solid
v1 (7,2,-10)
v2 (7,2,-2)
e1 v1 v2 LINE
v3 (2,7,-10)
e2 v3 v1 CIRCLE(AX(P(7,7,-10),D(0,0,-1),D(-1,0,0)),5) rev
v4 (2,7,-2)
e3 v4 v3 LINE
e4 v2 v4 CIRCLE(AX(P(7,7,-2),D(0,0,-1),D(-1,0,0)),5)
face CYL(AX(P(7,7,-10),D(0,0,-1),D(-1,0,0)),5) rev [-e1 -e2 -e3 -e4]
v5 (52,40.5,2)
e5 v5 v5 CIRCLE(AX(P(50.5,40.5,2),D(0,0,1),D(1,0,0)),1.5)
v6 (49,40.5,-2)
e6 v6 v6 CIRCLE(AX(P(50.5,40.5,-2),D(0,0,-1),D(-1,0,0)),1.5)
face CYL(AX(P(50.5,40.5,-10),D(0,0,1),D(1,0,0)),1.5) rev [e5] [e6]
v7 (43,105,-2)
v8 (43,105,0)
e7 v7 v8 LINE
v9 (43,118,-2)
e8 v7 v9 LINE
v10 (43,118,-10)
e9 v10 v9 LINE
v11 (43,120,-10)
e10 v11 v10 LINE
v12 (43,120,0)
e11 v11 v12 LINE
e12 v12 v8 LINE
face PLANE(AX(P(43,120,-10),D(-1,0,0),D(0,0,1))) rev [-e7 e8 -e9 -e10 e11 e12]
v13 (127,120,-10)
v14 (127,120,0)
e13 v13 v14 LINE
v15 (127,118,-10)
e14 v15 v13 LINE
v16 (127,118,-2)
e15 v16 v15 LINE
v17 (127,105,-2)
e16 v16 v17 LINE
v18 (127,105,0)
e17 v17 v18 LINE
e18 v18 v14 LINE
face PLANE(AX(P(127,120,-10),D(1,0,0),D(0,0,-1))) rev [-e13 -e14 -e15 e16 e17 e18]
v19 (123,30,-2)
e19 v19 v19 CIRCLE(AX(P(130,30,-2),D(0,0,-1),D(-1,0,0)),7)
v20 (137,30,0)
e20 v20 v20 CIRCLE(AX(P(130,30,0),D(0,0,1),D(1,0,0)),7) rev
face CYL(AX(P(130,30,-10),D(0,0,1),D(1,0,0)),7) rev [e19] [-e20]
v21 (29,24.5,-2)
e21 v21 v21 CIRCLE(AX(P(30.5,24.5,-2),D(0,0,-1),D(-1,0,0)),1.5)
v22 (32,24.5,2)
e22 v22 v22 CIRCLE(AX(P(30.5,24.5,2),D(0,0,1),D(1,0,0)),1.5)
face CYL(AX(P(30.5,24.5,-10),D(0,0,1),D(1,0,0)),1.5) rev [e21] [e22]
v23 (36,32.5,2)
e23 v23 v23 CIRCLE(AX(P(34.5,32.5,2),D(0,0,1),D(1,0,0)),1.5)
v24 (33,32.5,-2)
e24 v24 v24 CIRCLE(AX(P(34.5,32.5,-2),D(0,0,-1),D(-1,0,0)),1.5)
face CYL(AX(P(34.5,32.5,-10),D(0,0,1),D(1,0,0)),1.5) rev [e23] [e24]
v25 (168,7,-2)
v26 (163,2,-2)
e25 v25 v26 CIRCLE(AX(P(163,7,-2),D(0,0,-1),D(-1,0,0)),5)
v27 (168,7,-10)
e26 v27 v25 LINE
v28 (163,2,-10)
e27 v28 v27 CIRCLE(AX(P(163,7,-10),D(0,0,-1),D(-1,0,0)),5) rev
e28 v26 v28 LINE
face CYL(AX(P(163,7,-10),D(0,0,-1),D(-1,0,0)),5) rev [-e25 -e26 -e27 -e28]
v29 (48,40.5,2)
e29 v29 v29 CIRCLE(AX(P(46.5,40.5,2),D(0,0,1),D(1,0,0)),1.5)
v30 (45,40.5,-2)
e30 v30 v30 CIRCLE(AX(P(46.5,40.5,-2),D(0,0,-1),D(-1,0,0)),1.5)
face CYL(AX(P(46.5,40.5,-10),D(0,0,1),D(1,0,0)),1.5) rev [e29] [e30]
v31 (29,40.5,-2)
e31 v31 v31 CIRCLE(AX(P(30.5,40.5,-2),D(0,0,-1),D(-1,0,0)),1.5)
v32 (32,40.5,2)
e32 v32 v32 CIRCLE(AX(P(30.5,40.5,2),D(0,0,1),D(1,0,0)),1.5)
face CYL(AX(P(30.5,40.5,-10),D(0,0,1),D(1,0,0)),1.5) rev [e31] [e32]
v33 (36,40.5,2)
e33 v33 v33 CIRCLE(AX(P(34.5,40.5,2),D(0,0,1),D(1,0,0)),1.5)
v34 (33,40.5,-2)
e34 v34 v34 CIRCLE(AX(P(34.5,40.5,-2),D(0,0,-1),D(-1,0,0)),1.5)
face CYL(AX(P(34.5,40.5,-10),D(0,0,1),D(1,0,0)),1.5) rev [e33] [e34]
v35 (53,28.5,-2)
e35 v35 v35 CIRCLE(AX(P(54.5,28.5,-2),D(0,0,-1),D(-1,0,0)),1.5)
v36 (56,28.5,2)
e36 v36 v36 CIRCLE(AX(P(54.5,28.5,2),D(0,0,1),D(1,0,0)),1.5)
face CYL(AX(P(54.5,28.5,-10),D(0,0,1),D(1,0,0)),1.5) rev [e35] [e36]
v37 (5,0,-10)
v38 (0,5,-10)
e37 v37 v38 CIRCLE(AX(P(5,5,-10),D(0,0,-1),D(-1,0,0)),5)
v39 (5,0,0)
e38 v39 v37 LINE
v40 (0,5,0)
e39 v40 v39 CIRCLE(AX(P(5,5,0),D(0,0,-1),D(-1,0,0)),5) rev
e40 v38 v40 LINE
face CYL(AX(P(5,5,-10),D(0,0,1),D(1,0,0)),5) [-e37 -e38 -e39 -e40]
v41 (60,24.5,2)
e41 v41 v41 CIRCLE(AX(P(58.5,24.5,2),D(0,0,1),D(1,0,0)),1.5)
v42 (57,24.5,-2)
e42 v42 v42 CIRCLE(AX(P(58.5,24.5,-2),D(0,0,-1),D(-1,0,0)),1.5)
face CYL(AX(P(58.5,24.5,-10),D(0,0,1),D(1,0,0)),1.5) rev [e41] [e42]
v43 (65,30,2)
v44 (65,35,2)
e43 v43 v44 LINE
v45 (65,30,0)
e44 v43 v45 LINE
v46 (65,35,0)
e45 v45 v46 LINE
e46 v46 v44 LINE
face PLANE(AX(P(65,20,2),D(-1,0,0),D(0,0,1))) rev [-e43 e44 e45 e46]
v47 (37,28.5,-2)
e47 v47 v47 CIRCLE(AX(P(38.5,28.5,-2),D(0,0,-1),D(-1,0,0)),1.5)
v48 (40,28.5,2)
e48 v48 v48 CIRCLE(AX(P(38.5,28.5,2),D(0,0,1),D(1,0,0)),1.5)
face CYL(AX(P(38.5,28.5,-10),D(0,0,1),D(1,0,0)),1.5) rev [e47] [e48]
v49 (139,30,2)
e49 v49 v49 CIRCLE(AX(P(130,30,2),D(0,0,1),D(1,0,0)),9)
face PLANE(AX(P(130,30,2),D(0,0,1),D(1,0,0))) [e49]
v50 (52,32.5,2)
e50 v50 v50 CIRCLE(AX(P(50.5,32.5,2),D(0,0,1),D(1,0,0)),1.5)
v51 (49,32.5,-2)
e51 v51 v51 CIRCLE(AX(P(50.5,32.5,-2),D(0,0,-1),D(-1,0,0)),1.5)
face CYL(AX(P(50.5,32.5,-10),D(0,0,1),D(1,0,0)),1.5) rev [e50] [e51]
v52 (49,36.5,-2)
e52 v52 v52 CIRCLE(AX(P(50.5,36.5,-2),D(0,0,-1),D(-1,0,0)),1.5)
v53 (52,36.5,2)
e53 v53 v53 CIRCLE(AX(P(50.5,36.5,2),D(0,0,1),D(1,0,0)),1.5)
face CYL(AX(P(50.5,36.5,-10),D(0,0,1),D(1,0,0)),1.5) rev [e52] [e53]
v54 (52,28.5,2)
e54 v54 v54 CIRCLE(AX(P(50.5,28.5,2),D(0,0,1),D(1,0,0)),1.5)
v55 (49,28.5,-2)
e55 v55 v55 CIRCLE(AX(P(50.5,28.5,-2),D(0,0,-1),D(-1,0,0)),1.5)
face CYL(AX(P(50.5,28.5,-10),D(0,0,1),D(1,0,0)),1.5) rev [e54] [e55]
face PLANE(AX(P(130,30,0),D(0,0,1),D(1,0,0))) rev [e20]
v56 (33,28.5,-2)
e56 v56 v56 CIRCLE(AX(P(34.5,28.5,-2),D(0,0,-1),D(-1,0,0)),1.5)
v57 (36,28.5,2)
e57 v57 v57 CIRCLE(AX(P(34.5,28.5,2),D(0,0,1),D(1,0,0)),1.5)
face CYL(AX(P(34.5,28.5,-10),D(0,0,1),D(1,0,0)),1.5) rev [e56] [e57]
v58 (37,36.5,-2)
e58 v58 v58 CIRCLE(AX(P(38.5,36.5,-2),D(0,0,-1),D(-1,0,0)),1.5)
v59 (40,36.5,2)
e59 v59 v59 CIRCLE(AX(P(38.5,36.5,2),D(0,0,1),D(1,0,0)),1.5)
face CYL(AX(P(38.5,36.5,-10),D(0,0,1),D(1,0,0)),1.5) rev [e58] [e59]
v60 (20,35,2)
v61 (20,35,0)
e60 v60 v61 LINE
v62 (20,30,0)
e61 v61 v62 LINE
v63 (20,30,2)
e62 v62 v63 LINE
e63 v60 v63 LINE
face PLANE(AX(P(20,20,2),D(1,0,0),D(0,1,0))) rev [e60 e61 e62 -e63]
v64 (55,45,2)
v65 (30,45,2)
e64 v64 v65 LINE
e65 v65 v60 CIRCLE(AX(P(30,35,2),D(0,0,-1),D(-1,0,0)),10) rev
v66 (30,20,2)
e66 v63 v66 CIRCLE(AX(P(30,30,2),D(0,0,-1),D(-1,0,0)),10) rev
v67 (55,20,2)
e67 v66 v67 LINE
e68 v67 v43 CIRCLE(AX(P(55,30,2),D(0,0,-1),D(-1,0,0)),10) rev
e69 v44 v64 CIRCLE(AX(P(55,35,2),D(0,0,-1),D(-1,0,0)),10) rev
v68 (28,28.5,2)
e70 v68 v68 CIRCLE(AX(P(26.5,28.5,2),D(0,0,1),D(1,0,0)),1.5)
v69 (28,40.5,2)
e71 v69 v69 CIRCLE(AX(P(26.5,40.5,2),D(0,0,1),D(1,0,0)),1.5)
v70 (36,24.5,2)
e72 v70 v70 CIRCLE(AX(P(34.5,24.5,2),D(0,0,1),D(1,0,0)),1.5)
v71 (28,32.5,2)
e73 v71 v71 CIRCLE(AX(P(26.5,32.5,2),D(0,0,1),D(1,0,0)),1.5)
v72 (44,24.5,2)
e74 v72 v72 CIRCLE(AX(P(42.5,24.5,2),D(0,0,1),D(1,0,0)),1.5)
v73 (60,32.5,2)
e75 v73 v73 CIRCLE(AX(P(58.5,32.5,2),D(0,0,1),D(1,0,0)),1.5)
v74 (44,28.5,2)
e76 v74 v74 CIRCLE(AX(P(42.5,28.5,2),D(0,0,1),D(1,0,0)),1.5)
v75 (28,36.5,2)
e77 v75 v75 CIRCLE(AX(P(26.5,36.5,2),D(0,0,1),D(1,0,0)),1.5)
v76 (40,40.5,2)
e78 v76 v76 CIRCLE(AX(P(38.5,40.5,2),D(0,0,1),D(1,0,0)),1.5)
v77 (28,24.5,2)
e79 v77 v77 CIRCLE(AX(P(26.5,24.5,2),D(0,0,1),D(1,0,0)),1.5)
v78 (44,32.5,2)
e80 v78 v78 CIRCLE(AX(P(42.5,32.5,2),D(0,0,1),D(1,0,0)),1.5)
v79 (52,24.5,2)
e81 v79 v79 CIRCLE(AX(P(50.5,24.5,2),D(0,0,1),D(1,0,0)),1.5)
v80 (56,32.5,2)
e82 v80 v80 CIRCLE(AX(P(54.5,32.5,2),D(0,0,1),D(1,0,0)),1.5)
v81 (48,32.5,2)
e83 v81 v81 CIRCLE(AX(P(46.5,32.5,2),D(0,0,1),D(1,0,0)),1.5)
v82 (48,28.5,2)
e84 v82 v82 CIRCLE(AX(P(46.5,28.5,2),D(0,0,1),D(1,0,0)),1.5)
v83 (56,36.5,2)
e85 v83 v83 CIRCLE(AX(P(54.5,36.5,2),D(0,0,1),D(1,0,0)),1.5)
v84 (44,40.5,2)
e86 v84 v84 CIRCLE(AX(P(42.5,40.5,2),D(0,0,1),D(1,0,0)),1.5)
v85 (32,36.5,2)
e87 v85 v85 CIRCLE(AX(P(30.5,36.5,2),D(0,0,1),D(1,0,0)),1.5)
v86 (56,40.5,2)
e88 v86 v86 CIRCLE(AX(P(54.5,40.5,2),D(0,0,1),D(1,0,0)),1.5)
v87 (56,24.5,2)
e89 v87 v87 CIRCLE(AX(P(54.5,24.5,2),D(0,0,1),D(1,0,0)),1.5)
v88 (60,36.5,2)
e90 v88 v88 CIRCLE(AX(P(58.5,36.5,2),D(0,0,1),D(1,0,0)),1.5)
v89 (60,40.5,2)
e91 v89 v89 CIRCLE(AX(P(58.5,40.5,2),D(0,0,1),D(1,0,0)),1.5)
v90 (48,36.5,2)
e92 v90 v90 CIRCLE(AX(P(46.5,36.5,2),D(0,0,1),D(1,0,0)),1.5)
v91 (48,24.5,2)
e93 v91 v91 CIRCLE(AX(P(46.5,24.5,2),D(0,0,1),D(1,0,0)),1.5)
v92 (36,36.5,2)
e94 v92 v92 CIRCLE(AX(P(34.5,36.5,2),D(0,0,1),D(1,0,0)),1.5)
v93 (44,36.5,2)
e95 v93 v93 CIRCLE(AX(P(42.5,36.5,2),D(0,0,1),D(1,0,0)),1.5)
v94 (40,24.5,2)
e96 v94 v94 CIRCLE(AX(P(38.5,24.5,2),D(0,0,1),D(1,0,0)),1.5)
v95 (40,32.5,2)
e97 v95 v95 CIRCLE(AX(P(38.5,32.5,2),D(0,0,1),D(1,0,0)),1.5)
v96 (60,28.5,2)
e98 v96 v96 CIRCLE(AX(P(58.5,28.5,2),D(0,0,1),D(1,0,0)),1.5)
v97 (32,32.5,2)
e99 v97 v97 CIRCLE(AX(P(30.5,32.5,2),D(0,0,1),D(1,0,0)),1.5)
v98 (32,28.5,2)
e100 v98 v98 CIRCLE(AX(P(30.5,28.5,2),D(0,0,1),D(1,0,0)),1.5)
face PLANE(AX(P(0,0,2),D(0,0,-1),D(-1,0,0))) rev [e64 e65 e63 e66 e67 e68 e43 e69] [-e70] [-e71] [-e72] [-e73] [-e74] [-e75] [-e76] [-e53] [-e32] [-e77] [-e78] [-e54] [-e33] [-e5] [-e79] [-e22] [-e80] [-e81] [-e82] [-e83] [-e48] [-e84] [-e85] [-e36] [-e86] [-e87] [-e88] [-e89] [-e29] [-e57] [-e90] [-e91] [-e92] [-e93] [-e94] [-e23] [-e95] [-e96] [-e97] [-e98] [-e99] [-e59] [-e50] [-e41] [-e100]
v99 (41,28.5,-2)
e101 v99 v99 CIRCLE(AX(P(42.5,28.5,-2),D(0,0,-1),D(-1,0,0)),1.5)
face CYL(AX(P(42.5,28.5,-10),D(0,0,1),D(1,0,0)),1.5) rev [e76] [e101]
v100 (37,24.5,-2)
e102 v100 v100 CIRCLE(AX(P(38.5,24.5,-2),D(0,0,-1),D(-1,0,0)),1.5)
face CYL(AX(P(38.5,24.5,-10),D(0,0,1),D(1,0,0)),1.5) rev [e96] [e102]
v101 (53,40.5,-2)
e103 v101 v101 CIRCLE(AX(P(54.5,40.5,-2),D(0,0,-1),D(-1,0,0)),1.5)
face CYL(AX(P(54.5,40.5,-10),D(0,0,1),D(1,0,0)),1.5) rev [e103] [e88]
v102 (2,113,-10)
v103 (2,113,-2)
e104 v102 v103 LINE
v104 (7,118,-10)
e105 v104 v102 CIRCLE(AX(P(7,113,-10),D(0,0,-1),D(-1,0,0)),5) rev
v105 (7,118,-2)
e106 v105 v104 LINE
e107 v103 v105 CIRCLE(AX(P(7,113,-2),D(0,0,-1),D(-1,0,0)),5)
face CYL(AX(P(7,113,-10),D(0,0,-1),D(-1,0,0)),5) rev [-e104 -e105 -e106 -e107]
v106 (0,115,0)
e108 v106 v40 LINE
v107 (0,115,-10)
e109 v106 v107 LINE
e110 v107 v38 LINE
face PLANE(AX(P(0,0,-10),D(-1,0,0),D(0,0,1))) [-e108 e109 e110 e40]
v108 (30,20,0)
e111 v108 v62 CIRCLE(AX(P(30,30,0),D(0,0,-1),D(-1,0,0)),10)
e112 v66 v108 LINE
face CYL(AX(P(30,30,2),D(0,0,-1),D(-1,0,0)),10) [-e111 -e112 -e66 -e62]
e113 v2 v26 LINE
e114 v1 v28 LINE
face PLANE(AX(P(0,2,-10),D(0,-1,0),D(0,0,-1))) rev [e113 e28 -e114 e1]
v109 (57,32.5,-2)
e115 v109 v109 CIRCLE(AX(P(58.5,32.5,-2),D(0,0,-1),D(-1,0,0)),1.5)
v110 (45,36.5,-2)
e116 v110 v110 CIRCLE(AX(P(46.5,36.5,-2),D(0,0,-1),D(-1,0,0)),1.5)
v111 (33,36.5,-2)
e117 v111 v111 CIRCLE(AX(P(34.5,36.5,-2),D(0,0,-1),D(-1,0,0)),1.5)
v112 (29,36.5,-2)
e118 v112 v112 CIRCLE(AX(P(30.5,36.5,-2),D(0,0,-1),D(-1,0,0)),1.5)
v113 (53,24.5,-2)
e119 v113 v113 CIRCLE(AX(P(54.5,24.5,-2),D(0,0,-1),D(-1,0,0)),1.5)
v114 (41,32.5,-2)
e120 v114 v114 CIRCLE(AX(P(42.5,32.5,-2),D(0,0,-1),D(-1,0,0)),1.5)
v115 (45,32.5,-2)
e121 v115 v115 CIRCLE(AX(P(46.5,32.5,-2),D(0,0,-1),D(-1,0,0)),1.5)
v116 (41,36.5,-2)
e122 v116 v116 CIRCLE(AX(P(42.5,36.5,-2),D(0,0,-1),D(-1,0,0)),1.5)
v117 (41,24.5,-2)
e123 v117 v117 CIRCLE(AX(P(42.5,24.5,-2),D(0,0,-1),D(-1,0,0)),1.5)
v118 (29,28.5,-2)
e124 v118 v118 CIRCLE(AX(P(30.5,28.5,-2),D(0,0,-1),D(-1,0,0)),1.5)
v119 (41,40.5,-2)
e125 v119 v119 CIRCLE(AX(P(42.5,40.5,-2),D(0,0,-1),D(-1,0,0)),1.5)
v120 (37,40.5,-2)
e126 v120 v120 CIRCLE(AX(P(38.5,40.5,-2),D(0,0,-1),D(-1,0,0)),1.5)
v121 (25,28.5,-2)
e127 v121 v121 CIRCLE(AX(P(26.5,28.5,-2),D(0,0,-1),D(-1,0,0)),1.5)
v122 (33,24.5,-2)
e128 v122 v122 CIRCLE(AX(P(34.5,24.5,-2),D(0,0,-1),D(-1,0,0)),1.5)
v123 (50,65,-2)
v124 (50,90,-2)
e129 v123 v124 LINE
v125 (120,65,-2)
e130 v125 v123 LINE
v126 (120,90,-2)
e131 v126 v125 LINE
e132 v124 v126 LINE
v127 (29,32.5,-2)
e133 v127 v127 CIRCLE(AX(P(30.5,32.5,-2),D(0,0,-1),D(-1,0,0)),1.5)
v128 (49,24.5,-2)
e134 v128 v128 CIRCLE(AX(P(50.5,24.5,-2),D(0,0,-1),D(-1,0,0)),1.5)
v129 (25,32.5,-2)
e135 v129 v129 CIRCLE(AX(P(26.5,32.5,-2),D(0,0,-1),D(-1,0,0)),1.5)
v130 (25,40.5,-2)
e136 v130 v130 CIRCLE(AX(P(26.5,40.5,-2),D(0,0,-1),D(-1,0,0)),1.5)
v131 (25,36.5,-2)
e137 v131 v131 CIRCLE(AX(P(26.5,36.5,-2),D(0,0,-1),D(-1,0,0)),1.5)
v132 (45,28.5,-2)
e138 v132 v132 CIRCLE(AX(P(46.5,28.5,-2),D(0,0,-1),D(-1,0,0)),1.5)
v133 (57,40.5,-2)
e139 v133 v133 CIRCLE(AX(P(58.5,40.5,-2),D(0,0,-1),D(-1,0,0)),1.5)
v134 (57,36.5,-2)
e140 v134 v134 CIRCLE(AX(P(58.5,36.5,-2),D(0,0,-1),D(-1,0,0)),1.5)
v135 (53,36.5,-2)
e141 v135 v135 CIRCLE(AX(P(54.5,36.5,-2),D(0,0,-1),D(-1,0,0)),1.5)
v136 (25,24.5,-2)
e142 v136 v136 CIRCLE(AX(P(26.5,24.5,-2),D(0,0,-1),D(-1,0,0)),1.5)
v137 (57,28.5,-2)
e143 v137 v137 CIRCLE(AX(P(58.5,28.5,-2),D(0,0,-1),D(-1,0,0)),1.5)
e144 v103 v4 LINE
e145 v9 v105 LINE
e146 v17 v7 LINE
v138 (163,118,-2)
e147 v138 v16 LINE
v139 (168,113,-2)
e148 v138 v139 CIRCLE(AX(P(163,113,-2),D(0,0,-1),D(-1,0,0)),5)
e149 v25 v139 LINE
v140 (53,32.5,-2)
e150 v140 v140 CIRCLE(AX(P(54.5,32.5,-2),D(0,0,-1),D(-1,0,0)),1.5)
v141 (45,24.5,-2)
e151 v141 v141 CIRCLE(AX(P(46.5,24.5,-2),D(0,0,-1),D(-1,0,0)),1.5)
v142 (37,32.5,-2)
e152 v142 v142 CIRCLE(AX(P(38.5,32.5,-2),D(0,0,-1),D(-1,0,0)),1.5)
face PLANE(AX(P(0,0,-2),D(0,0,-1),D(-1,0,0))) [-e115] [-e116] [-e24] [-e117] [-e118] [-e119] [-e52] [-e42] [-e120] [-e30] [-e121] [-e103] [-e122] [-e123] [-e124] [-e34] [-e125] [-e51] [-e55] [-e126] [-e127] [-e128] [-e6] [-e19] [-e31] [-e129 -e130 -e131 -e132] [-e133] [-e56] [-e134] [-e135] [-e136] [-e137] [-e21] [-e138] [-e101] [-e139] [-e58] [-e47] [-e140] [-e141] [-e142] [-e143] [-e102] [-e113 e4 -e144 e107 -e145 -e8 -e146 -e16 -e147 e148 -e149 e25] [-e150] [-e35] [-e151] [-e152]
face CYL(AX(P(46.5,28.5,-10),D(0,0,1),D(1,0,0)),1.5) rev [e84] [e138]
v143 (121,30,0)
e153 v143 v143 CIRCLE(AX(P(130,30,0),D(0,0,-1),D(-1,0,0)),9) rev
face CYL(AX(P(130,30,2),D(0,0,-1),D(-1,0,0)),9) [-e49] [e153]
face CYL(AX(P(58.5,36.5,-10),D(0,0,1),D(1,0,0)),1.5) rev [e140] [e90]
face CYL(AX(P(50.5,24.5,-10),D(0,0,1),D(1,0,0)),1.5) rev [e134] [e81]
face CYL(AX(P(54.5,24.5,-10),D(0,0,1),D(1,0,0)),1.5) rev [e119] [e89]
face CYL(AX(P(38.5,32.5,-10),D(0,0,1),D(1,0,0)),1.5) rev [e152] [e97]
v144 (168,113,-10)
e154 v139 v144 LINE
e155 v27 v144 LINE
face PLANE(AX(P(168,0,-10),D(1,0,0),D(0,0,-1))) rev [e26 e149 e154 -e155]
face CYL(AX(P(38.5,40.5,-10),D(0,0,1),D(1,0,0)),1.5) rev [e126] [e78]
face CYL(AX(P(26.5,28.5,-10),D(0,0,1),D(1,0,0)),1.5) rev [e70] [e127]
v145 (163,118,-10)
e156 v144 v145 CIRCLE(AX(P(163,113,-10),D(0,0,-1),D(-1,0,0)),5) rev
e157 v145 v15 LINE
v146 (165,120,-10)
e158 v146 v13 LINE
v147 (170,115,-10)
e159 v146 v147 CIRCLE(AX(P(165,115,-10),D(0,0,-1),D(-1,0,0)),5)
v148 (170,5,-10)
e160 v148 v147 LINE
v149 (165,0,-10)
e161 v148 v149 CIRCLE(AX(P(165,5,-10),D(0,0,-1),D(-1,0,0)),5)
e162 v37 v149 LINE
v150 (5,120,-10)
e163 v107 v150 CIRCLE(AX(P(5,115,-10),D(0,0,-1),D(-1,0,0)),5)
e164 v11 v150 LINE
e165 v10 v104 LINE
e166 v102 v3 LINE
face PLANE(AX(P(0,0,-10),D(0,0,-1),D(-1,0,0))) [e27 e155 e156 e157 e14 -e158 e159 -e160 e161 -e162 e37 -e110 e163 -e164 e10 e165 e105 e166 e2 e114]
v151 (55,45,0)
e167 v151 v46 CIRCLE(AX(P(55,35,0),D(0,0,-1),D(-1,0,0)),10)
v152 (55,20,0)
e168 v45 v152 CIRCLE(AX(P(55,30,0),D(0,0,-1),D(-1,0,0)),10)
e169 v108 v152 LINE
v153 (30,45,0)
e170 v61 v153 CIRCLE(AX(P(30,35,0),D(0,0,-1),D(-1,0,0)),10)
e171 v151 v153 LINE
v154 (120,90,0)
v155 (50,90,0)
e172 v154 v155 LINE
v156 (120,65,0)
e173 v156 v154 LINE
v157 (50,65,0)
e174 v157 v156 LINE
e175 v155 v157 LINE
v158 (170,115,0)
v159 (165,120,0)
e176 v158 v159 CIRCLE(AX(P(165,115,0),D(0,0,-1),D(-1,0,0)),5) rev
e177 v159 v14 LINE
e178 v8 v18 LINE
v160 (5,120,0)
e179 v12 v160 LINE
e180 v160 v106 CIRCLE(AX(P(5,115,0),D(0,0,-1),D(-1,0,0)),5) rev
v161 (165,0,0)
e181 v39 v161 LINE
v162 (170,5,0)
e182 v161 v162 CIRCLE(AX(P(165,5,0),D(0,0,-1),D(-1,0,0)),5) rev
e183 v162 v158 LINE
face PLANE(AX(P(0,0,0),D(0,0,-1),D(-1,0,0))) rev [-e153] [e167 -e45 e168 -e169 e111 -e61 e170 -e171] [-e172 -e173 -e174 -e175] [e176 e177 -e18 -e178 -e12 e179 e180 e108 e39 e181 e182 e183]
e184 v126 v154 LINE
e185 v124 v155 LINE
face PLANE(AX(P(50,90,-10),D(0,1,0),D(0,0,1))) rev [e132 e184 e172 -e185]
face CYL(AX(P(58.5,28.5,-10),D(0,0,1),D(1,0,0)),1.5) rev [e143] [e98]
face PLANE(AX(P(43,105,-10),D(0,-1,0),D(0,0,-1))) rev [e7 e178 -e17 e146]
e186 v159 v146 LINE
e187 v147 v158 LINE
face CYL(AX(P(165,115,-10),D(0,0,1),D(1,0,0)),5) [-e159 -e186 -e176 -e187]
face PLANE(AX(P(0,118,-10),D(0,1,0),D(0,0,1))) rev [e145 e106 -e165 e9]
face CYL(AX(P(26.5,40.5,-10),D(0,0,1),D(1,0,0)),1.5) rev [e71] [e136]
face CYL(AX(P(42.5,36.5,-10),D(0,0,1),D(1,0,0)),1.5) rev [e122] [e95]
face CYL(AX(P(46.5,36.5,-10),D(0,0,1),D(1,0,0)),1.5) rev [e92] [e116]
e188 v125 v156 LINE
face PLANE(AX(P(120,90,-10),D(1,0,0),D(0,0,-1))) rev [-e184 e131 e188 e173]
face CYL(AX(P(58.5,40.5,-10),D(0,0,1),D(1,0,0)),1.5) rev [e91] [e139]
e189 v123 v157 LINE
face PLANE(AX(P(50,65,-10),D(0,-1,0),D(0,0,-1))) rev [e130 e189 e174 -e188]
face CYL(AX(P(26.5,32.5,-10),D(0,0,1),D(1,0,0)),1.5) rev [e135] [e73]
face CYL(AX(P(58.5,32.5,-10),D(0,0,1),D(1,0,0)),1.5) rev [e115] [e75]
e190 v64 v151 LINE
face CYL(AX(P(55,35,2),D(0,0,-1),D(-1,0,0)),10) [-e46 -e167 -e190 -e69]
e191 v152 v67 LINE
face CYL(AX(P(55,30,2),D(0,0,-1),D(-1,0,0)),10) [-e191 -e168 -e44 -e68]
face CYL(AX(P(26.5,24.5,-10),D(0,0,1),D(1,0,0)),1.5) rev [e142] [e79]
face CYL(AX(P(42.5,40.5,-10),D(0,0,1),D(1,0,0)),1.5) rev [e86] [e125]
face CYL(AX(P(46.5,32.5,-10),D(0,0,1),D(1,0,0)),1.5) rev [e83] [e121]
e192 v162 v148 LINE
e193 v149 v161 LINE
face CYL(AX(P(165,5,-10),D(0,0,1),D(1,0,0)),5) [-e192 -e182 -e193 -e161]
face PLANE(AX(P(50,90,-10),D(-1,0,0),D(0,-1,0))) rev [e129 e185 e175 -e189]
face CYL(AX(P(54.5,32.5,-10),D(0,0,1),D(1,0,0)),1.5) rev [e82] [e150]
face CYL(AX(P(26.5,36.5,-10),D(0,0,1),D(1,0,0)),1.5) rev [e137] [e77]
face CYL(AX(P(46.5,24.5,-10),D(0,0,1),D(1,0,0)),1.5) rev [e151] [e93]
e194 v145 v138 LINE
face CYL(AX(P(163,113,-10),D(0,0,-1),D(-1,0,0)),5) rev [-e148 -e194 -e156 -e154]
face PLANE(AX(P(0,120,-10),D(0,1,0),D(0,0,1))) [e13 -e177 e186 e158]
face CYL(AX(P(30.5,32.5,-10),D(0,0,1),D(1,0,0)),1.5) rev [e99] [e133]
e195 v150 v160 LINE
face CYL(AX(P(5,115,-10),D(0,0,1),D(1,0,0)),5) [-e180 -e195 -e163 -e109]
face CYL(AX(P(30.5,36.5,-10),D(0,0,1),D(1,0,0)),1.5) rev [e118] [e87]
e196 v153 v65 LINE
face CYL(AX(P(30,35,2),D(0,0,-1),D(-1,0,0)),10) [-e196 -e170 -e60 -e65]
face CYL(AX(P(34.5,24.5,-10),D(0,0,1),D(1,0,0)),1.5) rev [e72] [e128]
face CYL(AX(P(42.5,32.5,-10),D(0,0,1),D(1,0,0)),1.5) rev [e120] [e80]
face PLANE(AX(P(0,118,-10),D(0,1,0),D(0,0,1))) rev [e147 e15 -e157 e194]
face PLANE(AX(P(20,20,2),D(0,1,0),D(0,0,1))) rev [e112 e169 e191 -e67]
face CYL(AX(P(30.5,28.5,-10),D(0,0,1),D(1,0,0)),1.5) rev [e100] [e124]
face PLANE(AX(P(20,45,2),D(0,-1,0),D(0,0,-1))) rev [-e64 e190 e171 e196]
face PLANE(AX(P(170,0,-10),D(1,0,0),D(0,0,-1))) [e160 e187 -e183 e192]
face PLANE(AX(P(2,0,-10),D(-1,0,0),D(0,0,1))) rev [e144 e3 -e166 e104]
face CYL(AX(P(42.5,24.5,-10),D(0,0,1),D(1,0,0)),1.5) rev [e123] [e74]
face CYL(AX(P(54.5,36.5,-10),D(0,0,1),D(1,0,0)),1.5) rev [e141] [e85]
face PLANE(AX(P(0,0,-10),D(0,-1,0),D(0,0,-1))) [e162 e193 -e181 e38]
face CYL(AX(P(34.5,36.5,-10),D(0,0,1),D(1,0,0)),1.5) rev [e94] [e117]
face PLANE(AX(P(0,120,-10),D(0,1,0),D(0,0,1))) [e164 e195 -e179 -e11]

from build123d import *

# Parameters (mm, degrees)
SKETCH1_W               = 170
SKETCH1_H               = 120
BOSS_EXTRUDE1_DEPTH     = 10
SHELL1_T                = -2
FILLET1_R               = 5
SKETCH2_R               = 7
CUT_EXTRUDE1_DEPTH      = 209.32666656
SKETCH3_R               = 9
BOSS_EXTRUDE2_DEPTH     = 2
SKETCH4_W               = 70
SKETCH4_H               = 25
CUT_EXTRUDE2_DEPTH      = 209.32666656
SKETCH10_W              = 45
SKETCH10_H              = 25
BOSS_EXTRUDE4_DEPTH     = 2
FILL_START              = -2
FILL_PATTERN2_OUTLINE_R = 1.5
FILL_PATTERN2_DEPTH     = 4
FILLET2_R               = 10
SKETCH11_W              = 84
SKETCH11_H              = 15
CUT_EXTRUDE3_DEPTH      = 209.32666656


# Read off the part's stored shape, not the designer's step: Fill Pattern2
with BuildPart() as part:
    # Sketch1 → Boss-Extrude1 (new body)
    with BuildSketch(Plane.XY):
        with Locations((85, 60)):
            Rectangle(SKETCH1_W, SKETCH1_H)
    extrude(amount=-BOSS_EXTRUDE1_DEPTH)

    # Shell1
    shell1_openings = [part.faces().sort_by_distance(p)[0] for p in [
        (85, 60, -10),
    ]]
    offset(amount=SHELL1_T, openings=shell1_openings, kind=Kind.INTERSECTION)

    # Fillet1
    fillet1_edges = [part.edges().sort_by_distance(p)[0] for p in [
        (2, 2, -6),
        (2, 118, -6),
        (168, 118, -6),
        (168, 2, -6),
        (0, 120, -5),
        (170, 120, -5),
        (170, 0, -5),
        (0, 0, -5),
    ]]
    fillet(fillet1_edges, radius=FILLET1_R)

    # Sketch2 → Cut-Extrude1 (cut, through all)
    with BuildSketch(Plane.XY):
        with Locations((130, 30)):
            Circle(SKETCH2_R)
    extrude(amount=-CUT_EXTRUDE1_DEPTH, mode=Mode.SUBTRACT)

    # Sketch3 → Boss-Extrude2 (add)
    with BuildSketch(Plane.XY):
        with Locations(Location((130, 30, 0), (0, 0, 180))):
            Circle(SKETCH3_R)
    extrude(amount=BOSS_EXTRUDE2_DEPTH)

    # Sketch4 → Cut-Extrude2 (cut, through all)
    with BuildSketch(Plane.XY):
        with Locations((85, 77.5)):
            Rectangle(SKETCH4_W, SKETCH4_H)
    extrude(amount=-CUT_EXTRUDE2_DEPTH, mode=Mode.SUBTRACT)

    # Sketch10 → Boss-Extrude4 (add)
    with BuildSketch(Plane.XY):
        with Locations((42.5, 32.5)):
            Rectangle(SKETCH10_W, SKETCH10_H)
    extrude(amount=BOSS_EXTRUDE4_DEPTH)

    # Fill Pattern2 outline → Fill Pattern2 (cut)
    with BuildSketch(Plane.XY.offset(FILL_START)):
        with Locations((42.5, 32.5)):
            Circle(FILL_PATTERN2_OUTLINE_R)
        with Locations((30.5, 32.5)):
            Circle(FILL_PATTERN2_OUTLINE_R)
        with Locations((30.5, 36.5)):
            Circle(FILL_PATTERN2_OUTLINE_R)
        with Locations((30.5, 40.5)):
            Circle(FILL_PATTERN2_OUTLINE_R)
        with Locations((26.5, 24.5)):
            Circle(FILL_PATTERN2_OUTLINE_R)
        with Locations((30.5, 24.5)):
            Circle(FILL_PATTERN2_OUTLINE_R)
        with Locations((42.5, 40.5)):
            Circle(FILL_PATTERN2_OUTLINE_R)
        with Locations((30.5, 28.5)):
            Circle(FILL_PATTERN2_OUTLINE_R)
        with Locations((46.5, 40.5)):
            Circle(FILL_PATTERN2_OUTLINE_R)
        with Locations((26.5, 28.5)):
            Circle(FILL_PATTERN2_OUTLINE_R)
        with Locations((26.5, 32.5)):
            Circle(FILL_PATTERN2_OUTLINE_R)
        with Locations((26.5, 36.5)):
            Circle(FILL_PATTERN2_OUTLINE_R)
        with Locations((26.5, 40.5)):
            Circle(FILL_PATTERN2_OUTLINE_R)
        with Locations((54.5, 32.5)):
            Circle(FILL_PATTERN2_OUTLINE_R)
        with Locations((50.5, 28.5)):
            Circle(FILL_PATTERN2_OUTLINE_R)
        with Locations((42.5, 28.5)):
            Circle(FILL_PATTERN2_OUTLINE_R)
        with Locations((58.5, 40.5)):
            Circle(FILL_PATTERN2_OUTLINE_R)
        with Locations((54.5, 28.5)):
            Circle(FILL_PATTERN2_OUTLINE_R)
        with Locations((50.5, 24.5)):
            Circle(FILL_PATTERN2_OUTLINE_R)
        with Locations((38.5, 28.5)):
            Circle(FILL_PATTERN2_OUTLINE_R)
        with Locations((58.5, 36.5)):
            Circle(FILL_PATTERN2_OUTLINE_R)
        with Locations((50.5, 36.5)):
            Circle(FILL_PATTERN2_OUTLINE_R)
        with Locations((46.5, 32.5)):
            Circle(FILL_PATTERN2_OUTLINE_R)
        with Locations((50.5, 40.5)):
            Circle(FILL_PATTERN2_OUTLINE_R)
        with Locations((46.5, 36.5)):
            Circle(FILL_PATTERN2_OUTLINE_R)
        with Locations((54.5, 36.5)):
            Circle(FILL_PATTERN2_OUTLINE_R)
        with Locations((50.5, 32.5)):
            Circle(FILL_PATTERN2_OUTLINE_R)
        with Locations((46.5, 28.5)):
            Circle(FILL_PATTERN2_OUTLINE_R)
        with Locations((54.5, 40.5)):
            Circle(FILL_PATTERN2_OUTLINE_R)
        with Locations((42.5, 36.5)):
            Circle(FILL_PATTERN2_OUTLINE_R)
        with Locations((38.5, 24.5)):
            Circle(FILL_PATTERN2_OUTLINE_R)
        with Locations((34.5, 24.5)):
            Circle(FILL_PATTERN2_OUTLINE_R)
        with Locations((34.5, 28.5)):
            Circle(FILL_PATTERN2_OUTLINE_R)
        with Locations((34.5, 32.5)):
            Circle(FILL_PATTERN2_OUTLINE_R)
        with Locations((34.5, 36.5)):
            Circle(FILL_PATTERN2_OUTLINE_R)
        with Locations((34.5, 40.5)):
            Circle(FILL_PATTERN2_OUTLINE_R)
        with Locations((38.5, 40.5)):
            Circle(FILL_PATTERN2_OUTLINE_R)
        with Locations((58.5, 32.5)):
            Circle(FILL_PATTERN2_OUTLINE_R)
        with Locations((38.5, 32.5)):
            Circle(FILL_PATTERN2_OUTLINE_R)
        with Locations((46.5, 24.5)):
            Circle(FILL_PATTERN2_OUTLINE_R)
        with Locations((54.5, 24.5)):
            Circle(FILL_PATTERN2_OUTLINE_R)
        with Locations((58.5, 28.5)):
            Circle(FILL_PATTERN2_OUTLINE_R)
        with Locations((38.5, 36.5)):
            Circle(FILL_PATTERN2_OUTLINE_R)
        with Locations((42.5, 24.5)):
            Circle(FILL_PATTERN2_OUTLINE_R)
        with Locations((58.5, 24.5)):
            Circle(FILL_PATTERN2_OUTLINE_R)
    extrude(amount=FILL_PATTERN2_DEPTH, mode=Mode.SUBTRACT)

    # Fillet2
    fillet2_edges = [part.edges().sort_by_distance(p)[0] for p in [
        (20, 45, 1),
        (20, 20, 1),
        (65, 20, 1),
        (65, 45, 1),
    ]]
    fillet(fillet2_edges, radius=FILLET2_R)

    # Sketch11 → Cut-Extrude3 (cut, through all)
    with BuildSketch(Plane.XY):
        with Locations((85, 112.5)):
            Rectangle(SKETCH11_W, SKETCH11_H)
    extrude(amount=-CUT_EXTRUDE3_DEPTH, mode=Mode.SUBTRACT)


solid = part.part
